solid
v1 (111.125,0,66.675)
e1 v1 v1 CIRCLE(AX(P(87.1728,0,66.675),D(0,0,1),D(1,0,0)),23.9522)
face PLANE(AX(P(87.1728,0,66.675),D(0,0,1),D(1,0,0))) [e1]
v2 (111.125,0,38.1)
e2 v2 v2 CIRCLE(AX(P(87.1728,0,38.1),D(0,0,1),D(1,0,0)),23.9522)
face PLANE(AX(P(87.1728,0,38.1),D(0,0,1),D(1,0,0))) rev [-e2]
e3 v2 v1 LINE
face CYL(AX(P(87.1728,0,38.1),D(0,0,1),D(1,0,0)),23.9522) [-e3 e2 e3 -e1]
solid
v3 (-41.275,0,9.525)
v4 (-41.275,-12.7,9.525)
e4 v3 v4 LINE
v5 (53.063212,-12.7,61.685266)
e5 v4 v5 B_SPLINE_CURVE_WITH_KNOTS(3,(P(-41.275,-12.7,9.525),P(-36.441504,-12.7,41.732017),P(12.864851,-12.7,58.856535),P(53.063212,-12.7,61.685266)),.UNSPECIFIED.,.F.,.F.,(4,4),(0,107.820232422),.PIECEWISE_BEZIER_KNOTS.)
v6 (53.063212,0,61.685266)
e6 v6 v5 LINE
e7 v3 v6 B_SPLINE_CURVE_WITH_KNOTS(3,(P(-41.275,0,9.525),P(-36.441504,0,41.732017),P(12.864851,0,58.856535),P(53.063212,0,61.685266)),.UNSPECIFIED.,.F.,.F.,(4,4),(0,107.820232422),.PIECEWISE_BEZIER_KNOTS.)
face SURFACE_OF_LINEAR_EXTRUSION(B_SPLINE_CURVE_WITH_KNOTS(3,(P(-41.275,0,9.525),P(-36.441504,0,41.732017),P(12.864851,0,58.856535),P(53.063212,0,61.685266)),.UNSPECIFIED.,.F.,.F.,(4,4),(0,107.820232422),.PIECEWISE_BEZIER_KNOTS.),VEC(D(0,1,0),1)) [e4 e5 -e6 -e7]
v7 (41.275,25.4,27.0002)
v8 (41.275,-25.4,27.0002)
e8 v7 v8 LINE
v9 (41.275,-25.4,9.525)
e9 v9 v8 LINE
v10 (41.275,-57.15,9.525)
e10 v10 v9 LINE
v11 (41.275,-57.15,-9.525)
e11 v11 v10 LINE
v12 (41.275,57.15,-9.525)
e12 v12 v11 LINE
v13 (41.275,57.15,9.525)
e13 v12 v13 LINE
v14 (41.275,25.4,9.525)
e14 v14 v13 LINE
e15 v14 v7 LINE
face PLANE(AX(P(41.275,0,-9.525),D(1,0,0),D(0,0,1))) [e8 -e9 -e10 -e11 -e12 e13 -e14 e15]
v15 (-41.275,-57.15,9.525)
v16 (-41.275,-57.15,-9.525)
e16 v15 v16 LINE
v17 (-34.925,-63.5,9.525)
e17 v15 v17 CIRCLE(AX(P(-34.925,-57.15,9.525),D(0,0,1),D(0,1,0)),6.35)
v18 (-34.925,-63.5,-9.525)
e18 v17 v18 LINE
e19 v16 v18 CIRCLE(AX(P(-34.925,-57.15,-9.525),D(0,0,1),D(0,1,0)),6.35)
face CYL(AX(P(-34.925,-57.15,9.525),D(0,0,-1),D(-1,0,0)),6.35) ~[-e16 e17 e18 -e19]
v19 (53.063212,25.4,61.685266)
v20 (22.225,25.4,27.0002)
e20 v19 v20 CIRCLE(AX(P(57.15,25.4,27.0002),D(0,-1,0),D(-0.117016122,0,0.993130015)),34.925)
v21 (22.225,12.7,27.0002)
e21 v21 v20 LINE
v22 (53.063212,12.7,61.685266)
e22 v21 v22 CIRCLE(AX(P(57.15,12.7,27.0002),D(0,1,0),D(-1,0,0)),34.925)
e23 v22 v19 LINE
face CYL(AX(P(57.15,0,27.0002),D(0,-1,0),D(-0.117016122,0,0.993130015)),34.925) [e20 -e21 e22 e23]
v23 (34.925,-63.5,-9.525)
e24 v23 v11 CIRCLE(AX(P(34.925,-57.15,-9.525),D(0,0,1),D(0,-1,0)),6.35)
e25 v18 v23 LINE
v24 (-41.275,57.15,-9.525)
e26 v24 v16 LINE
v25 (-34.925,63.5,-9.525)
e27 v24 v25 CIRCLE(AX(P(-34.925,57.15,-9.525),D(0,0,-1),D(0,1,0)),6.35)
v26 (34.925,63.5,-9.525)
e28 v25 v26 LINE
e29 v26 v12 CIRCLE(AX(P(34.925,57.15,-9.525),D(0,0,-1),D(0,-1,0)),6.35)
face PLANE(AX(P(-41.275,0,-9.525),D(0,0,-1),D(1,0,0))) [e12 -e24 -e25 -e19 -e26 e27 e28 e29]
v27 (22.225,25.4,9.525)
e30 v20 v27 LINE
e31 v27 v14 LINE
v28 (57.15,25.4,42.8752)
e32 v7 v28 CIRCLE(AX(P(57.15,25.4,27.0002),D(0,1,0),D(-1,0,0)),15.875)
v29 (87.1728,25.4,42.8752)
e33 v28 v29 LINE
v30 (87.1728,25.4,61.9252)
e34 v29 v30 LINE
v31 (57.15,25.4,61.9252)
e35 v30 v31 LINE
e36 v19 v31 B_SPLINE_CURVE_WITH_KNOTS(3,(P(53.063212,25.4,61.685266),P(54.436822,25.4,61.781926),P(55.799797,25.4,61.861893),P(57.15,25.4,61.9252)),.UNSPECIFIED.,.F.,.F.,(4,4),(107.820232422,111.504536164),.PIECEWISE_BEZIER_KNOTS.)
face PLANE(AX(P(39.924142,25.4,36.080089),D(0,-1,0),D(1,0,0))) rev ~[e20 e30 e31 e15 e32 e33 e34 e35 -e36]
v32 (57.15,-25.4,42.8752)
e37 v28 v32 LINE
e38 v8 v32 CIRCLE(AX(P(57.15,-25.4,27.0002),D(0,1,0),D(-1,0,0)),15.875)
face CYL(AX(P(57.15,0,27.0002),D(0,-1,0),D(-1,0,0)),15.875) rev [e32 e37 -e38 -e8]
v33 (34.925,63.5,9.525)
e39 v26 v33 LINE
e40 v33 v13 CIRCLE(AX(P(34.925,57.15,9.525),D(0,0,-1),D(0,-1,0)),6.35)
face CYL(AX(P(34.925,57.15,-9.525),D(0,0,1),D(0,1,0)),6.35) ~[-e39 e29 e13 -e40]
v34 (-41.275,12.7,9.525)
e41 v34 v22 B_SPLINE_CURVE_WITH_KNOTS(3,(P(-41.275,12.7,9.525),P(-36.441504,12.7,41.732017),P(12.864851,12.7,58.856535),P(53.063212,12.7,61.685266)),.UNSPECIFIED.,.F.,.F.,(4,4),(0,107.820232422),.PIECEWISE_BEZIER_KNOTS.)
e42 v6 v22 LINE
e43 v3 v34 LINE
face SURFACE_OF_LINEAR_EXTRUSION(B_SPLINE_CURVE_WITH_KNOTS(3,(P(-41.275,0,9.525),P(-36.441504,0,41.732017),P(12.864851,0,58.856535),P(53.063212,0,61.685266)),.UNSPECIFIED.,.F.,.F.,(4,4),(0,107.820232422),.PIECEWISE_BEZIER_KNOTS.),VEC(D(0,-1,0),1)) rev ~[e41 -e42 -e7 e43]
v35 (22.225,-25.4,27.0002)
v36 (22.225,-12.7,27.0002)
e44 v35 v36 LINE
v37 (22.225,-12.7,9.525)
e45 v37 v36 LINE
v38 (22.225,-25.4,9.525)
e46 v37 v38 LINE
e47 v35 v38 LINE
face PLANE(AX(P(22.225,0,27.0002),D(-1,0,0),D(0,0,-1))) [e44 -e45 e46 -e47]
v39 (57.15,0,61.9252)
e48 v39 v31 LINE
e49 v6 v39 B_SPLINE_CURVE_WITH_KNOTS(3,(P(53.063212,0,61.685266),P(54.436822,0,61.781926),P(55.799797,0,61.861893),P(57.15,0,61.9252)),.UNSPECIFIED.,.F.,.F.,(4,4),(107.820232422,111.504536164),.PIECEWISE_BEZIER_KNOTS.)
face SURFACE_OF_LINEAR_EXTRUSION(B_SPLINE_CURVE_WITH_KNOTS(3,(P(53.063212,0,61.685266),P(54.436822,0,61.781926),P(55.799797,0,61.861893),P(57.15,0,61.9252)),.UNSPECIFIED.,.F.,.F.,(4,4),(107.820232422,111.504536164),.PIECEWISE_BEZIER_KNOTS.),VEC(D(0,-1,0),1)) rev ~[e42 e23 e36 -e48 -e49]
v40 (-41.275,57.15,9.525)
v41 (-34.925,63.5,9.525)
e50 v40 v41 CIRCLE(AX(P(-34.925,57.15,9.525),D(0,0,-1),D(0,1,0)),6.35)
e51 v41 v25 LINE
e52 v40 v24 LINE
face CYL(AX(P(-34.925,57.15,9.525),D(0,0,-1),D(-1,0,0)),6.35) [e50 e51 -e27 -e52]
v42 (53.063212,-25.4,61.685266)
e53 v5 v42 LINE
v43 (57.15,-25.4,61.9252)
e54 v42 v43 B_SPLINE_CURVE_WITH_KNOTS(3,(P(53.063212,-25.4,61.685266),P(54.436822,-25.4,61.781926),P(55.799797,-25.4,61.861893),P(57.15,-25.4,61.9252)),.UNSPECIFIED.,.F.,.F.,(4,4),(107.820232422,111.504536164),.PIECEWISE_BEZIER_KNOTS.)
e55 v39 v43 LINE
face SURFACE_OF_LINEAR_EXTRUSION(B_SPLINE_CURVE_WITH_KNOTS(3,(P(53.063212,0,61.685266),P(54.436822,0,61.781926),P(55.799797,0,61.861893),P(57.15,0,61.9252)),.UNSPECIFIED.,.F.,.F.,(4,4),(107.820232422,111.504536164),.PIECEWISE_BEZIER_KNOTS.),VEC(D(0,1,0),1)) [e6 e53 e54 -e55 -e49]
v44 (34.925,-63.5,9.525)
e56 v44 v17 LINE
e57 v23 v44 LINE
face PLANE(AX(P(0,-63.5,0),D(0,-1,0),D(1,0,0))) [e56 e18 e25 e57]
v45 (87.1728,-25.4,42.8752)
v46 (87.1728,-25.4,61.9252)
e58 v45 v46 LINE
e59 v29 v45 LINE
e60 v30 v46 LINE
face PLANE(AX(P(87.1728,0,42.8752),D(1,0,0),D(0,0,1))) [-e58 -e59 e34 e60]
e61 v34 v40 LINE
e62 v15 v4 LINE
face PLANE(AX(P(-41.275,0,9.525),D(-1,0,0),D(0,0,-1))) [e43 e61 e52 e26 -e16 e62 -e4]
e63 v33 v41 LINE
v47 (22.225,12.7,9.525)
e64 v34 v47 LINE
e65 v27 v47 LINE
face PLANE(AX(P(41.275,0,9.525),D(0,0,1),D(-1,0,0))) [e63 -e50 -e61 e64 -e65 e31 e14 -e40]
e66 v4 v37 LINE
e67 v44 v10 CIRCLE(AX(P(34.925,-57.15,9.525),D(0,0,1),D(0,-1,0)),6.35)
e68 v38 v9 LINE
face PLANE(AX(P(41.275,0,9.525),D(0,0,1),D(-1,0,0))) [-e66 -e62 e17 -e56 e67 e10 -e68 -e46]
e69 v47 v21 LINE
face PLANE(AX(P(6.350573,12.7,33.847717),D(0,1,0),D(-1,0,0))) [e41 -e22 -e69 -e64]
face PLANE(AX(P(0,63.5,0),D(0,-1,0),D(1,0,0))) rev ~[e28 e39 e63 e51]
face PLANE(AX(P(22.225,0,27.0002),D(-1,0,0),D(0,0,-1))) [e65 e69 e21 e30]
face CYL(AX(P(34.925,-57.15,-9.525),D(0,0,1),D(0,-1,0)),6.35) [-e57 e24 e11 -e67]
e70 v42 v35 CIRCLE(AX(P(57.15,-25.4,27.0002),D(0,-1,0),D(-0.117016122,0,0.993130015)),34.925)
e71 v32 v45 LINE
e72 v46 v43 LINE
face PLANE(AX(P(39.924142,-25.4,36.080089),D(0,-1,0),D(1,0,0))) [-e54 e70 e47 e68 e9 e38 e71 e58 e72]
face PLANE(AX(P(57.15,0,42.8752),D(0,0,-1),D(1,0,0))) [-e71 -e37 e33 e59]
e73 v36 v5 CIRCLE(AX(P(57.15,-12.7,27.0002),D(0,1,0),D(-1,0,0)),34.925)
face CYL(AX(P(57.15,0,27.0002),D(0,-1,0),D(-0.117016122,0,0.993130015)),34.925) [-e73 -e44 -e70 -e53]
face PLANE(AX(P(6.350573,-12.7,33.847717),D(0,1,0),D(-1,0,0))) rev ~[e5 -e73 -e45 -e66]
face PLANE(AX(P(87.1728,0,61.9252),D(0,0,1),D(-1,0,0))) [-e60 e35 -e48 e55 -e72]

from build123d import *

# Parameters (mm, degrees)
F1_DEPTH = 63.5
F0_W     = 26.8478
F0_H     = 19.05
F2_DEPTH = 25.4
F3_DEPTH = 12.7
F5_R     = 6.35


# Not quite as in the source:
# - a feature names something its author has since deleted; it is built from what else it names


with BuildPart() as f1:
    # F0 (on Front) → F1 (new body, symmetric)
    with BuildSketch(Plane.XZ):
        Polygon((22.225, 9.525), (-41.275, 9.525), (-41.275, -9.525), (41.275, -9.525), (41.275, 9.525), align=None)
    extrude(amount=F1_DEPTH, both=True)

    # F0 (on Front) → F2 (join, symmetric)
    with BuildSketch(Plane.XZ):
        with BuildLine():
            Line((22.225, 27.0002), (22.225, 9.525))
            Line((22.225, 9.525), (41.275, 9.525))
            Line((41.275, 9.525), (41.275, 27.0002))
            ThreePointArc((41.275, 27.0002), (45.9246798487, 38.2255201513), (57.15, 42.8752))
            Line((57.15, 42.8752), (60.325, 42.8752))
            Line((60.325, 42.8752), (60.325, 61.9252))
            Line((60.325, 61.9252), (57.15, 61.9252))
            add(Edge.make_bspline(
                [(53.0632119302, 61.6852657816), (54.436822126, 61.7819257772), (55.7997974291, 61.8618933869), (57.15, 61.9252)],
                knots=[107.8202324218, 107.8202324218, 107.8202324218, 107.8202324218, 111.5045361635, 111.5045361635, 111.5045361635, 111.5045361635], degree=3))
            ThreePointArc((53.0632119302, 61.6852657816), (31.0493611349, 50.2060672717), (22.225, 27.0002))
        make_face()
        with Locations((73.7489, 52.4002)):
            Rectangle(F0_W, F0_H)
    extrude(amount=F2_DEPTH, both=True)

    # F0 (on Front) → F3 (join, symmetric)
    with BuildSketch(Plane.XZ):
        with BuildLine():
            add(Edge.make_bspline(
                [(-41.275, 9.525), (-36.4415043335, 41.7320166895), (12.8648512777, 58.8565350576), (53.0632119302, 61.6852657816)],
                knots=[0, 0, 0, 0, 107.8202324218, 107.8202324218, 107.8202324218, 107.8202324218], degree=3))
            Line((-41.275, 9.525), (22.225, 9.525))
            Line((22.225, 9.525), (22.225, 27.0002))
            ThreePointArc((22.225, 27.0002), (31.0493611349, 50.2060672717), (53.0632119302, 61.6852657816))
        make_face()
    extrude(amount=F3_DEPTH, both=True)

    # F5
    f5_edges = [f1.edges().sort_by_distance(p)[0] for p in [
        (-41.275, -63.5, 0),
        (41.275, -63.5, 0),
        (41.275, 63.5, 0),
        (-41.275, 63.5, 0),
    ]]
    fillet(f5_edges, radius=F5_R)


with BuildPart() as f4:
    # F0 (on Front) → F4 (revolve)
    with BuildSketch(Plane.XZ):
        Polygon((87.1728, 66.675), (87.1728, 61.9252), (87.1728, 42.8752), (87.1728, 38.1), (111.125, 38.1), (111.125, 66.675), align=None)
    revolve(axis=Axis((87.1728, 0, 52.3875), (0, 0, 1)))


solid = Compound([f1.part, f4.part])
